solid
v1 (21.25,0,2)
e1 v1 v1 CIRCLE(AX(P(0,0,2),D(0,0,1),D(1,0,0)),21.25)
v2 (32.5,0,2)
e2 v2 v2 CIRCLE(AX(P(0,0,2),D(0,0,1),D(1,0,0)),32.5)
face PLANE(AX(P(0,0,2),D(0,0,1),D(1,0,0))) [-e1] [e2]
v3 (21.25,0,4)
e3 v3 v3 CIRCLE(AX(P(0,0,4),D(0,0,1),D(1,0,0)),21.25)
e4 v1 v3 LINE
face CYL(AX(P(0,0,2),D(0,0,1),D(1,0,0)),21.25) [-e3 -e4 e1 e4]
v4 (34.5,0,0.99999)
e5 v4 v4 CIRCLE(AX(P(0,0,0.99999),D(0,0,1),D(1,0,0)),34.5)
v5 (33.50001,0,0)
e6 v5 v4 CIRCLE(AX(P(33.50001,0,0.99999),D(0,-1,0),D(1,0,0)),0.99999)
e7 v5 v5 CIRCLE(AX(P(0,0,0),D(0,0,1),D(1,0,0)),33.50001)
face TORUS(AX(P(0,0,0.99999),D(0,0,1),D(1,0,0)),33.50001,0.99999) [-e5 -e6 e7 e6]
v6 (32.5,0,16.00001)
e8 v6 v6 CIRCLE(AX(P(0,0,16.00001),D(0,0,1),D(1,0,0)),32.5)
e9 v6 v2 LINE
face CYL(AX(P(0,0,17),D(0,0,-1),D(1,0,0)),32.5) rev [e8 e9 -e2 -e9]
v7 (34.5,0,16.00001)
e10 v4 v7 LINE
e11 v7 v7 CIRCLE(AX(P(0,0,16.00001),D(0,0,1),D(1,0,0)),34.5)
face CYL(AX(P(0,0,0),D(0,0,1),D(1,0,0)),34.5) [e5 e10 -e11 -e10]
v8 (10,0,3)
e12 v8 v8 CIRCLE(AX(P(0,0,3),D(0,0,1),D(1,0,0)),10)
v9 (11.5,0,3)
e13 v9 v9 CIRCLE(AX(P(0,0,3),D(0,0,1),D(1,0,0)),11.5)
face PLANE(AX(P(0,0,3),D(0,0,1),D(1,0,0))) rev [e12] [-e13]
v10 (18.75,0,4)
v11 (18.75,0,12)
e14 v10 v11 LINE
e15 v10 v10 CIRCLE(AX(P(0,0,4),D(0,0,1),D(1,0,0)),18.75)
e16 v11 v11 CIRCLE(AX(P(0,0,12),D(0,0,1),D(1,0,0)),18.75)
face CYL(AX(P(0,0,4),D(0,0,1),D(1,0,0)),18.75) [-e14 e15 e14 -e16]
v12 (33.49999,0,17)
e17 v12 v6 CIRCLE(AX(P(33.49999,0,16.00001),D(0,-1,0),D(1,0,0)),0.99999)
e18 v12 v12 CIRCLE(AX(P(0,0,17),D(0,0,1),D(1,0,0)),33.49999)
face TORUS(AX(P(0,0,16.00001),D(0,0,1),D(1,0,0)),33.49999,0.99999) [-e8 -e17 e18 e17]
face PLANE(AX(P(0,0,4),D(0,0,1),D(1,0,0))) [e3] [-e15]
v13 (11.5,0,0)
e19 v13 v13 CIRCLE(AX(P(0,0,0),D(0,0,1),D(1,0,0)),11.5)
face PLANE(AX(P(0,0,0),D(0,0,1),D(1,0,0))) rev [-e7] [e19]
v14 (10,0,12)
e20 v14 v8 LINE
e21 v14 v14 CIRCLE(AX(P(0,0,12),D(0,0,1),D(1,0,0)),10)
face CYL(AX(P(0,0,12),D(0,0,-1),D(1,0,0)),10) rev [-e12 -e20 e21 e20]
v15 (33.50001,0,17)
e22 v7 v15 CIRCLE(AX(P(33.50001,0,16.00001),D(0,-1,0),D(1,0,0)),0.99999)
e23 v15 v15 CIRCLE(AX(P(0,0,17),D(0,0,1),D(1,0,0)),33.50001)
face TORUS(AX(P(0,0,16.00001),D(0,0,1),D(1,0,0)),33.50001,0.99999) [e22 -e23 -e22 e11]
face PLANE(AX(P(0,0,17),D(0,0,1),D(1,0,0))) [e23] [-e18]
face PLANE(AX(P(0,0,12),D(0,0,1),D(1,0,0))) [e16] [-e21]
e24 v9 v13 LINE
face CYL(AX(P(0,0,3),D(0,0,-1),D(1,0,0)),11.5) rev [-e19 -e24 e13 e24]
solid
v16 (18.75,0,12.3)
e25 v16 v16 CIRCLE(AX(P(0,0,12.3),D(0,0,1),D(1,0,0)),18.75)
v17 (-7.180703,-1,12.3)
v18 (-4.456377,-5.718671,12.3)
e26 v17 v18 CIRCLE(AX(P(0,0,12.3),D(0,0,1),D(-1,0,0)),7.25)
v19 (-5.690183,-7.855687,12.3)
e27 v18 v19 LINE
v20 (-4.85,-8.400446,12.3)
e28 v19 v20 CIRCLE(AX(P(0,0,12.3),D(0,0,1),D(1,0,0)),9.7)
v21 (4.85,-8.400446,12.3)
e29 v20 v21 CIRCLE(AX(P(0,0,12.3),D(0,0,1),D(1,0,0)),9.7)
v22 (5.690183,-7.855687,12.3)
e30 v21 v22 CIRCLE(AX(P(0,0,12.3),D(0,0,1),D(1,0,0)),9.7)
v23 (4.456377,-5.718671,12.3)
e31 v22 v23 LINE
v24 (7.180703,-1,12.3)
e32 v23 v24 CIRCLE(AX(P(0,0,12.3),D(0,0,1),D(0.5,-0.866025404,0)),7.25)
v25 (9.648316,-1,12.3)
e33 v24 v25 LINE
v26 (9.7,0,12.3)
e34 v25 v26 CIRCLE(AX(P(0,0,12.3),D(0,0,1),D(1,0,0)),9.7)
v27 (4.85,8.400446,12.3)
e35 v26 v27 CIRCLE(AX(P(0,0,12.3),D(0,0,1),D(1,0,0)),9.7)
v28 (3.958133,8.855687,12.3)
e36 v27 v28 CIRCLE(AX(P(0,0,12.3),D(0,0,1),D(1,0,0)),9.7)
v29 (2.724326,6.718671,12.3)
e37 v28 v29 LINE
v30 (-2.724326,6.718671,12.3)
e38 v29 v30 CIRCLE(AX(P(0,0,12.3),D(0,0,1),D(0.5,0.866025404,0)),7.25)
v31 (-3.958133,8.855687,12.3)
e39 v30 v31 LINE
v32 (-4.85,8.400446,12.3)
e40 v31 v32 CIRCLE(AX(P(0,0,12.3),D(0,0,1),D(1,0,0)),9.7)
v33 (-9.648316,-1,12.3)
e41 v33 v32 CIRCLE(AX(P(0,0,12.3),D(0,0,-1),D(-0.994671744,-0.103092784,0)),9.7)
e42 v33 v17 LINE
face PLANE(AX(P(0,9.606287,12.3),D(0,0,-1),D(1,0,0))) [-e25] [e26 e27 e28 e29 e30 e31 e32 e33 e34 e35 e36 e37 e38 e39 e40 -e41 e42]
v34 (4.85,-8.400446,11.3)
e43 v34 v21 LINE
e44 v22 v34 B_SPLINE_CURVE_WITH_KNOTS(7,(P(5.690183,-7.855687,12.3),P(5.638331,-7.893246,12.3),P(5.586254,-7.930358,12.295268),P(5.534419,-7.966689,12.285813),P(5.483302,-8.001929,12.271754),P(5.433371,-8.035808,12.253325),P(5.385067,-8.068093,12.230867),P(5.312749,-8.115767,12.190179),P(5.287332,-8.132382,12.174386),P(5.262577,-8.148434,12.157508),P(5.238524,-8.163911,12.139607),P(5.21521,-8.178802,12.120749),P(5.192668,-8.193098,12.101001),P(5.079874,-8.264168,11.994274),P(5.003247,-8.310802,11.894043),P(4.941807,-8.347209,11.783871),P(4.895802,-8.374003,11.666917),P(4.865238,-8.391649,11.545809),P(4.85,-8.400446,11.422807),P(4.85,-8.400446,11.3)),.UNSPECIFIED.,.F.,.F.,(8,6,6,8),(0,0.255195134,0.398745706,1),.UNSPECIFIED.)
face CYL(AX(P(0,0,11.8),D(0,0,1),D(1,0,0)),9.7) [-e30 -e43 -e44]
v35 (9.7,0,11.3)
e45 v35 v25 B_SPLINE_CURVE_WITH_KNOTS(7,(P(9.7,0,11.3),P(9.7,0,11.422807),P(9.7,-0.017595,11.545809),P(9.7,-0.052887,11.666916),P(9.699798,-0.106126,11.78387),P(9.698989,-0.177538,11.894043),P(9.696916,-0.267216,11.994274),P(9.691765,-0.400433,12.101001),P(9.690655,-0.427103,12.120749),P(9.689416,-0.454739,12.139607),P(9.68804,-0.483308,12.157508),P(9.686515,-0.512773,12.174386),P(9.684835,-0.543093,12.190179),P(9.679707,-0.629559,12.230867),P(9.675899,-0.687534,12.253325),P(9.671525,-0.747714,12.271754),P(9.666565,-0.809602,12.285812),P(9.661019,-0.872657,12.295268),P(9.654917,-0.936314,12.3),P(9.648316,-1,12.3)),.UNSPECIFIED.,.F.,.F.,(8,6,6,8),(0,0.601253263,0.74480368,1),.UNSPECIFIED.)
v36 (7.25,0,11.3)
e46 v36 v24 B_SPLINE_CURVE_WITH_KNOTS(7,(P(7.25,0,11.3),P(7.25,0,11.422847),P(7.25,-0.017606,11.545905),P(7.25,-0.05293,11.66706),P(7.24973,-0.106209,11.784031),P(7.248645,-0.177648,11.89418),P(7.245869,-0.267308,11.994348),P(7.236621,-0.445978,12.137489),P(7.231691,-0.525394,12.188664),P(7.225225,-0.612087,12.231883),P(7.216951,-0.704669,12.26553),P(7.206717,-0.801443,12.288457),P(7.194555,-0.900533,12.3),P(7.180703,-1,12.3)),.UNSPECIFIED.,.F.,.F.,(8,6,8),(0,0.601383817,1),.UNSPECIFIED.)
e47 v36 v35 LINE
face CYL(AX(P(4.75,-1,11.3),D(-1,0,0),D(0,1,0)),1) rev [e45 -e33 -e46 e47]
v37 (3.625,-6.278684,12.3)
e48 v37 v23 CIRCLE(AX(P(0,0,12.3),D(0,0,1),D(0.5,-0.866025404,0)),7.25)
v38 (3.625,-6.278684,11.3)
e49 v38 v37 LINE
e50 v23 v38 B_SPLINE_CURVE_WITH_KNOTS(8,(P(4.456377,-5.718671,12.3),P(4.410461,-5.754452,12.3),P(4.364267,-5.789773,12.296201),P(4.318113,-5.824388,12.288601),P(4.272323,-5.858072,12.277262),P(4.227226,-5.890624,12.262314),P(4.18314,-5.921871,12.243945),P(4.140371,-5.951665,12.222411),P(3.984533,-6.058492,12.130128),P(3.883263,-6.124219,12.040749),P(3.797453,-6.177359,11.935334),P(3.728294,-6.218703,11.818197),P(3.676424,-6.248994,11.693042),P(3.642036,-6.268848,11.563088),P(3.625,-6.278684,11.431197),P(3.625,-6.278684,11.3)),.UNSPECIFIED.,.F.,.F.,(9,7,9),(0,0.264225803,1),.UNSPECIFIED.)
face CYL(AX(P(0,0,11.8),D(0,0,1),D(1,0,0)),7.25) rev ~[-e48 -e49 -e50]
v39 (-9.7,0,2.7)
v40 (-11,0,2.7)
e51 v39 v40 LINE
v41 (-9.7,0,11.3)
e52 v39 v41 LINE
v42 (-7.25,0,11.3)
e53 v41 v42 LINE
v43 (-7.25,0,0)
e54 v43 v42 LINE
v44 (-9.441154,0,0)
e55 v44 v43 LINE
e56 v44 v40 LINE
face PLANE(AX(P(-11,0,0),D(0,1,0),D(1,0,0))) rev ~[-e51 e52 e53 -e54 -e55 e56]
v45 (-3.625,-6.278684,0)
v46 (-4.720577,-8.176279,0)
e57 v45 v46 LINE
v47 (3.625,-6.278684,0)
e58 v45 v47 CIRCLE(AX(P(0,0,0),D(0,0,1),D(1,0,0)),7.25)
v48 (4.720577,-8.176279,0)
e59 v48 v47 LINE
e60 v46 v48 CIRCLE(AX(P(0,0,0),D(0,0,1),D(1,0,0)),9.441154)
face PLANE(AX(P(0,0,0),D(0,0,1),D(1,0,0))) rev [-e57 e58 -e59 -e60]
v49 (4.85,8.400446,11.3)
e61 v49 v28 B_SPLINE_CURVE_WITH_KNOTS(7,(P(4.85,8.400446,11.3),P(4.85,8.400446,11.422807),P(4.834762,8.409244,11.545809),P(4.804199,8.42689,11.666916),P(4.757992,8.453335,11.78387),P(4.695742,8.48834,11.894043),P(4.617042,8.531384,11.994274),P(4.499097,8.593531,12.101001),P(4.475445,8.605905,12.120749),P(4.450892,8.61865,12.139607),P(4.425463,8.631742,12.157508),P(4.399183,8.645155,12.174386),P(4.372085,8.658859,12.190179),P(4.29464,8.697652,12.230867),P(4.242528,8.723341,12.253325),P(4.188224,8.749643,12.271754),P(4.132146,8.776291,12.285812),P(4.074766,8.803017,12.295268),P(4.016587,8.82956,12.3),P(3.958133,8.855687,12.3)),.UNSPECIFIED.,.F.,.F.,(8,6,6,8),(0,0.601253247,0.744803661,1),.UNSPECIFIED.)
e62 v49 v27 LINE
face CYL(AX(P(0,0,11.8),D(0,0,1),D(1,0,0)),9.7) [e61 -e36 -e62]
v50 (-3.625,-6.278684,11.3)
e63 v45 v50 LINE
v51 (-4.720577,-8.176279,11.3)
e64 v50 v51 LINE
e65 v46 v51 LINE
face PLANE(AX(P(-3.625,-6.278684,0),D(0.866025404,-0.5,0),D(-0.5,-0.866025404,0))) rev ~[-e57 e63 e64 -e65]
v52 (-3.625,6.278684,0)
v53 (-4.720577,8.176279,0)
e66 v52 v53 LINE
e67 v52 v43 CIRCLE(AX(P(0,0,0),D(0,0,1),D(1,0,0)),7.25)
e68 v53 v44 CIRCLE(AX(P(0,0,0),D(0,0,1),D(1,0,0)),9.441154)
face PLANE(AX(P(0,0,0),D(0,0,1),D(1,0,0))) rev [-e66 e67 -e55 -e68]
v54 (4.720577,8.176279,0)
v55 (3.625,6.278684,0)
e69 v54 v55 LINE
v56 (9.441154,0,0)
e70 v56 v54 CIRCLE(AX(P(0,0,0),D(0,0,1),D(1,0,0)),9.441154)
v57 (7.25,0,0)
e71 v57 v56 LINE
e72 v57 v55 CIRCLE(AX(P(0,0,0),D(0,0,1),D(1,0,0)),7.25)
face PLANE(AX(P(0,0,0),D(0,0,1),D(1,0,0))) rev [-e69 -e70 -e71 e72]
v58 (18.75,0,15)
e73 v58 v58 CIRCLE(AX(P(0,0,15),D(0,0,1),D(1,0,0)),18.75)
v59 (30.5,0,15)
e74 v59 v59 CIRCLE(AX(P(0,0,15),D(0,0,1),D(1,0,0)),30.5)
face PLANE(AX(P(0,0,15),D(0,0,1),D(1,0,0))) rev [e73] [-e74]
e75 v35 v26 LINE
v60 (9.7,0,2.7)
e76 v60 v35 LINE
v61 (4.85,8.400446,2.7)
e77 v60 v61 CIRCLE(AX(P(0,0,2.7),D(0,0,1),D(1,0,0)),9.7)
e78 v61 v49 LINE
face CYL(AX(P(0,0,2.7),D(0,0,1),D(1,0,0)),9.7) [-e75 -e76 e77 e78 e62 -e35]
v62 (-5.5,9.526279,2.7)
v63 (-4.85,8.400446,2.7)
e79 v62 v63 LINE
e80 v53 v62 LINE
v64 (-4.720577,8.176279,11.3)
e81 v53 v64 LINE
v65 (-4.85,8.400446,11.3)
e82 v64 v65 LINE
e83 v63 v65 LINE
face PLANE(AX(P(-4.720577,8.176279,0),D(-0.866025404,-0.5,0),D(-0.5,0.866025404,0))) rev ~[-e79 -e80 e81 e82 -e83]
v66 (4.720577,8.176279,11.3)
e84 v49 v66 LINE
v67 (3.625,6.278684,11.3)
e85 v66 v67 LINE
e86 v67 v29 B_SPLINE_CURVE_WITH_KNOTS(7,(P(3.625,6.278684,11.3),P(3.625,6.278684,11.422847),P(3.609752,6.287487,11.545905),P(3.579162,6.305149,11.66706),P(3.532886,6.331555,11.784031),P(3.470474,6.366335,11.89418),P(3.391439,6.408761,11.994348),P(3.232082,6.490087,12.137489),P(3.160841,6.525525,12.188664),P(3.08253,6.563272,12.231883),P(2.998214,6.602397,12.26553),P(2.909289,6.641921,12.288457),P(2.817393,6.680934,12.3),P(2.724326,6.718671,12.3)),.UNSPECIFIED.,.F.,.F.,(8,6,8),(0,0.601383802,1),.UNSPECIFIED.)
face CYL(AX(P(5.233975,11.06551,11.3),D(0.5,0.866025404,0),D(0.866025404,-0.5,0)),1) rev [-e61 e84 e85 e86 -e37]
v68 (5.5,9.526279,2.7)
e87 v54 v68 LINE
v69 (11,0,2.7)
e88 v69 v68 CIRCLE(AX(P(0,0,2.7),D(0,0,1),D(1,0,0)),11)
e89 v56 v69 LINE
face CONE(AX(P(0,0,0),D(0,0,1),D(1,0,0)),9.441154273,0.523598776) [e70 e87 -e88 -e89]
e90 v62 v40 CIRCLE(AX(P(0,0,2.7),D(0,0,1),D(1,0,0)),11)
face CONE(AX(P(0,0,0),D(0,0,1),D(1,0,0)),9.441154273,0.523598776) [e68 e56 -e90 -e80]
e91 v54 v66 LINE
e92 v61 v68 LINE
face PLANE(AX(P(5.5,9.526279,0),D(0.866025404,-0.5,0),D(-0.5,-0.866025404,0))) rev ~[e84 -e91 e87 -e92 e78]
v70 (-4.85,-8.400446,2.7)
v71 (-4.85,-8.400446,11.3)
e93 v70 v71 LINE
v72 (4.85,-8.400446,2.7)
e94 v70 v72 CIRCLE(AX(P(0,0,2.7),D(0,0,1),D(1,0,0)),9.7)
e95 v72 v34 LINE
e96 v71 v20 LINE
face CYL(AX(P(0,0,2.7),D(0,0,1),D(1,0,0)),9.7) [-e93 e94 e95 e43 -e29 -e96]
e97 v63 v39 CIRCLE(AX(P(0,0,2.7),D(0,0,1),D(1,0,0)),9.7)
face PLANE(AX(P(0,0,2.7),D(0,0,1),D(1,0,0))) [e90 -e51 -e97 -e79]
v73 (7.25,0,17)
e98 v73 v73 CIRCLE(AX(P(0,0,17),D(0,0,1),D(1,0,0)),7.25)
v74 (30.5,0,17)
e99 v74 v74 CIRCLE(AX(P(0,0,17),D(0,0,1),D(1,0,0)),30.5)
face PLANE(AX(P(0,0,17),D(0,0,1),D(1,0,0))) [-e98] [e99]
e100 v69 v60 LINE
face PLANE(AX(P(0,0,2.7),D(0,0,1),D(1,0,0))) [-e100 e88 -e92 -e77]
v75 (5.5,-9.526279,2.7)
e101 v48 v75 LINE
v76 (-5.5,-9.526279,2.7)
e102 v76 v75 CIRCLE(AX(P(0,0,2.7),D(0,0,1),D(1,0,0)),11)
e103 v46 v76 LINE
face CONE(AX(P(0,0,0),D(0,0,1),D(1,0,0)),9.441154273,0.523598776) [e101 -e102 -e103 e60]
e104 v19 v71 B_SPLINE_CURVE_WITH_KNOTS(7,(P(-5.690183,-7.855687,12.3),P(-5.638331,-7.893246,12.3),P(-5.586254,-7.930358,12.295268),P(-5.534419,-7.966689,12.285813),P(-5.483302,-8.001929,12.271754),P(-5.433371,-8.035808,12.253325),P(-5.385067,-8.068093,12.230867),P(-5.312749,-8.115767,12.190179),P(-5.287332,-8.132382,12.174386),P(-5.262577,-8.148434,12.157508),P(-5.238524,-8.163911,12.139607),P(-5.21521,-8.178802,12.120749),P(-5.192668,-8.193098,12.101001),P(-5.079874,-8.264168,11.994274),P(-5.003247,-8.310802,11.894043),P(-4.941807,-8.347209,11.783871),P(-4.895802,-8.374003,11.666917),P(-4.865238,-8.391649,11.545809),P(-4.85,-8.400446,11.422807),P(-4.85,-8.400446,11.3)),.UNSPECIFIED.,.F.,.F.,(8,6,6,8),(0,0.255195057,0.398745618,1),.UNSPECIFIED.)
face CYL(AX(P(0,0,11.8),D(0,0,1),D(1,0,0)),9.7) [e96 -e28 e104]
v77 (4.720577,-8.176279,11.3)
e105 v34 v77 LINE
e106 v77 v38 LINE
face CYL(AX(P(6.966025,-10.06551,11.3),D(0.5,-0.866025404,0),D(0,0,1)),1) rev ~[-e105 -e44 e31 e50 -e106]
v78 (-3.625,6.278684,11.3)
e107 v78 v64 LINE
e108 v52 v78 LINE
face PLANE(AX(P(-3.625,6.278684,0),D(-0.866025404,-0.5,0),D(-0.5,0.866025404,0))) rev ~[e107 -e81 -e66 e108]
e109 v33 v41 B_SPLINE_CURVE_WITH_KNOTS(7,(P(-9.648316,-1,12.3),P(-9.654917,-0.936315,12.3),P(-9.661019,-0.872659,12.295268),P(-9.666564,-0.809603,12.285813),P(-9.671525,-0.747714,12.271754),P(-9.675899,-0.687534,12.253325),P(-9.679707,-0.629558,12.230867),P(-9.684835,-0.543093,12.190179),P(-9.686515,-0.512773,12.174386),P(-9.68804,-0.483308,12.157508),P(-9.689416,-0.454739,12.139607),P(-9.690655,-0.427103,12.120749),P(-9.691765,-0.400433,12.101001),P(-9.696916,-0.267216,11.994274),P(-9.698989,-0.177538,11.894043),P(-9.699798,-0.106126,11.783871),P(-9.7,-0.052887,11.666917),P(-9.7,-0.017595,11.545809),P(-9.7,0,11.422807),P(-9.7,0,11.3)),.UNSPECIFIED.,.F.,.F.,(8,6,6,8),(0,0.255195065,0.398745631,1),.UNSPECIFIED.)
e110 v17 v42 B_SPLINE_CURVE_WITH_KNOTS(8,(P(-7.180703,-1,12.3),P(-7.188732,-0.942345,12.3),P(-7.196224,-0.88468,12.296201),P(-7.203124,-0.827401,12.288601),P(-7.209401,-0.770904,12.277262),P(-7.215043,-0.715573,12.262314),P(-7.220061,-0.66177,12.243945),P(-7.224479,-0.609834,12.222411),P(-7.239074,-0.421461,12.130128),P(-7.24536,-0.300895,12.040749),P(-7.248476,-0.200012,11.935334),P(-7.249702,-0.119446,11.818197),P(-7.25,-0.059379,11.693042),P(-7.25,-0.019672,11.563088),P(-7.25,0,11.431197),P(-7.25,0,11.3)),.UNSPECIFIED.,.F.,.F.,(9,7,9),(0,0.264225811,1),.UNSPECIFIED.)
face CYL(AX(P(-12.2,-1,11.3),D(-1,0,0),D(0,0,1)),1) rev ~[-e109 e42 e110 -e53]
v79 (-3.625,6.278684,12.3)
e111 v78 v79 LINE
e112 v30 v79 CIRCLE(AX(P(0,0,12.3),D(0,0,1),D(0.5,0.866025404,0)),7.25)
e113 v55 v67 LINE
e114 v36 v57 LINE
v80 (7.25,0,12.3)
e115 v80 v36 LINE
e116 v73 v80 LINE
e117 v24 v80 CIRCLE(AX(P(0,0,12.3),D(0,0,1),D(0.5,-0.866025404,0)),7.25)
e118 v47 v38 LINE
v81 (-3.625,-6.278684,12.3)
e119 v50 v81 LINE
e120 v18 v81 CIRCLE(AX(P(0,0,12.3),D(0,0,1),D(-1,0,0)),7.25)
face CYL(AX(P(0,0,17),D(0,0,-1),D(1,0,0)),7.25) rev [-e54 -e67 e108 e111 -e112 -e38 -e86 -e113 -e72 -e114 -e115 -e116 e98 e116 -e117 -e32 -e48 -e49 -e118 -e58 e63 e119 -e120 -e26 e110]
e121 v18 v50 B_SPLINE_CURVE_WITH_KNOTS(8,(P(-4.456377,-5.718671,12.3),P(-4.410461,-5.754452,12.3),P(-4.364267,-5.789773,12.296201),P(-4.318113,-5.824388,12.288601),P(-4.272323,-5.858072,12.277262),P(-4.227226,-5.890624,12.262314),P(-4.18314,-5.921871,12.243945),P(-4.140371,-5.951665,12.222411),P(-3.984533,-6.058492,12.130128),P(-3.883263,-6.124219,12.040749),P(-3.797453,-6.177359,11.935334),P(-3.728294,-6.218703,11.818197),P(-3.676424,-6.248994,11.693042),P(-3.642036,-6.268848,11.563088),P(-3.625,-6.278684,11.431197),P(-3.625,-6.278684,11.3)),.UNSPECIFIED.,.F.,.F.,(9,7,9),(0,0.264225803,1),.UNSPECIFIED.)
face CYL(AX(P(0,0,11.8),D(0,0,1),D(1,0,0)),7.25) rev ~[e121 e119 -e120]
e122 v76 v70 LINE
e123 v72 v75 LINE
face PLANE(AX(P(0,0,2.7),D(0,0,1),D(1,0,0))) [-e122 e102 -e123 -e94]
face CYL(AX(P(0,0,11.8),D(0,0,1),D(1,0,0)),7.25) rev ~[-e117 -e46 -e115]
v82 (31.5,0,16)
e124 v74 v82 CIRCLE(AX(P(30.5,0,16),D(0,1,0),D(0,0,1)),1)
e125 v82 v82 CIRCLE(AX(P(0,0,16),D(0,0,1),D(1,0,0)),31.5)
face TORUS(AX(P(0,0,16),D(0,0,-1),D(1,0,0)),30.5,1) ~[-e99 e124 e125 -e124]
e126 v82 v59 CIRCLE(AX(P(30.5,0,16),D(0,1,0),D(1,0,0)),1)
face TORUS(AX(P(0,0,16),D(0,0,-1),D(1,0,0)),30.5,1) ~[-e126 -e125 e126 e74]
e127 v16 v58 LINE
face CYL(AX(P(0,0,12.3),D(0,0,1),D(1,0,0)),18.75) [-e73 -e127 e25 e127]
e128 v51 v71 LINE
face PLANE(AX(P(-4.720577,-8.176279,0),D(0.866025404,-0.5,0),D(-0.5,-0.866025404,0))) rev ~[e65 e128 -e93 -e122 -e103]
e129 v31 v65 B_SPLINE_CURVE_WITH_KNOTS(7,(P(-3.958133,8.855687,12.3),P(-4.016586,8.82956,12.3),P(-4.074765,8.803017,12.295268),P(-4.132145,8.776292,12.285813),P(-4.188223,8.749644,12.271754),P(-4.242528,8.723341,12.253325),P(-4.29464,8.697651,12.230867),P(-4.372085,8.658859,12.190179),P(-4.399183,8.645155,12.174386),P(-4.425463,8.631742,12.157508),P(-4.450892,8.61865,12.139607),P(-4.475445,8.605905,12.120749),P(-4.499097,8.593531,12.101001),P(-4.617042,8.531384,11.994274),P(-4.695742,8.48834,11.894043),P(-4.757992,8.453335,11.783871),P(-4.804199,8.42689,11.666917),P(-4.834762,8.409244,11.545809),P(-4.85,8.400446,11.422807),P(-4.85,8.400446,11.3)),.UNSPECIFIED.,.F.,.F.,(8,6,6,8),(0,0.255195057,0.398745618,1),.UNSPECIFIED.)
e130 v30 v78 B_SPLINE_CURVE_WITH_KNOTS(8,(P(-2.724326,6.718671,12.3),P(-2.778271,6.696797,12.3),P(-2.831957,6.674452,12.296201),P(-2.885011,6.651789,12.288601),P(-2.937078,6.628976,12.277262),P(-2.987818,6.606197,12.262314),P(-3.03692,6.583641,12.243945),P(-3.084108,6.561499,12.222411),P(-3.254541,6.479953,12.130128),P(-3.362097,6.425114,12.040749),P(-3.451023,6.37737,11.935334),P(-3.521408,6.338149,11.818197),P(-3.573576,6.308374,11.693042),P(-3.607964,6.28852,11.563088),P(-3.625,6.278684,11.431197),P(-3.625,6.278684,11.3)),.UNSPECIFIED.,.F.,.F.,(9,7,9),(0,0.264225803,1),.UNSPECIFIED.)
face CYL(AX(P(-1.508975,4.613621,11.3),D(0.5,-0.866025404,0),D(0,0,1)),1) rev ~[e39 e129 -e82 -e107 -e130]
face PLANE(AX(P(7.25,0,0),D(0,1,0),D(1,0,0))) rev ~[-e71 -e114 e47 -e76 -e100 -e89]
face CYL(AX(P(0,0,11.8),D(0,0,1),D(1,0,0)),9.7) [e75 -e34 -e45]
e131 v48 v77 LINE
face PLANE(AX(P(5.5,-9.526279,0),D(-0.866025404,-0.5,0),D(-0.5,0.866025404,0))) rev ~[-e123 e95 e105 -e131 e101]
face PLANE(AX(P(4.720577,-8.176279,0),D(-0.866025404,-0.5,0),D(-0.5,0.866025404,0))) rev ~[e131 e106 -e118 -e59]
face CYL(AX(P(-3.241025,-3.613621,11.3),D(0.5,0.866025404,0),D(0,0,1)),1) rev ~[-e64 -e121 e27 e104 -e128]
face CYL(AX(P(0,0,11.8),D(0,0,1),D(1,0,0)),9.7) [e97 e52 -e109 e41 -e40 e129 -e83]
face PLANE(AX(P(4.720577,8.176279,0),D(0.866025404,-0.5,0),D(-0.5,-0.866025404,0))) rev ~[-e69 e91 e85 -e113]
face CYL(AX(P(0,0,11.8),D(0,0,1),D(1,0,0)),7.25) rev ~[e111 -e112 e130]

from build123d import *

# Parameters (mm, degrees)
F3_DEPTH     = 12.3
F4_T4_DEPTH  = 7.45
F4_S5_R      = 7.25
F4_T6_DEPTH  = 6
F4_S7_R      = 9.7
F4_T8_DEPTH  = 6
F4_T12_DEPTH = 7.45
F4_S13_R     = 7.25
F4_T14_DEPTH = 6
F4_S15_R     = 9.7
F4_T16_DEPTH = 6
F4_T20_DEPTH = 7.45
F4_S21_R     = 7.25
F4_T22_DEPTH = 5
F4_S23_R     = 9.7
F4_T24_DEPTH = 5
F4_T28_DEPTH = 7.45
F4_S29_R     = 7.25
F4_T30_DEPTH = 6
F4_S31_R     = 9.7
F4_T32_DEPTH = 6
F4_T36_DEPTH = 7.45
F4_S37_R     = 7.25
F4_T38_DEPTH = 6
F4_S39_R     = 9.7
F4_T40_DEPTH = 6
F4_T44_DEPTH = 7.45
F4_S45_R     = 7.25
F4_T46_DEPTH = 5
F4_S47_R     = 9.7
F4_T48_DEPTH = 5
F5_R         = 0.99999


# Not quite as in the source:
# - a fillet or chamfer that OpenCascade refuses, or shapes differently, is made with other operations: its cross-section is extruded or revolved along the edge and cut away or added
# - a fillet or chamfer is up to 0.001 mm smaller than in the source, because OpenCascade refuses the exact size


with BuildPart() as f1:
    # F0 (on Front) → F1 (revolve)
    with BuildSketch(Plane.XZ):
        Polygon((18.75, 12), (10, 12), (10, 3), (11.5, 3), (11.5, 0), (34.5, 0), (34.5, 17), (32.5, 17), (32.5, 2), (21.25, 2), (21.25, 4), (18.75, 4), align=None)
    revolve(axis=Axis((0, 0, 6), (0, 0, 1)))

    # F5 (radius 1 in the source; OpenCascade refuses exactly that, so slightly less here)
    f5_edges = [f1.edges().sort_by_distance(p)[0] for p in [
        (-32.5, 0, 17),
        (-34.5, 0, 17),
        (-34.5, 0, 0),
    ]]
    fillet(f5_edges, radius=F5_R)


with BuildPart() as f1b:
    # F0 (on Front) → F1, piece 2 (revolve)
    with BuildSketch(Plane.XZ):
        Polygon((31.5, 17), (7.25, 17), (7.25, 0), (9.4411542732, 0), (11, 2.7), (9.7, 2.7), (9.7, 12.3), (18.75, 12.3), (18.75, 15), (31.5, 15), align=None)
    revolve(axis=Axis((0, 0, 6), (0, 0, 1)))

    # F2 (on face) → F3 (cut, through all)
    with BuildSketch(Plane(origin=(0, 0, 0), x_dir=(1, 0, 0), z_dir=(0, 0, -1))):
        with BuildLine():
            Line((-4.7205771366, -8.1762794416), (-5.5, -9.5262794416))
            ThreePointArc((-5.5, -9.5262794416), (0, -11), (5.5, -9.5262794416))
            Line((5.5, -9.5262794416), (4.7205771366, -8.1762794416))
            ThreePointArc((4.7205771366, -8.1762794416), (0, -9.4411542732), (-4.7205771366, -8.1762794416))
        make_face()
        with BuildLine():
            Line((-3.625, -6.2786841774), (-4.7205771366, -8.1762794416))
            ThreePointArc((-4.7205771366, -8.1762794416), (0, -9.4411542732), (4.7205771366, -8.1762794416))
            Line((4.7205771366, -8.1762794416), (3.625, -6.2786841774))
            ThreePointArc((3.625, -6.2786841774), (0, -7.25), (-3.625, -6.2786841774))
        make_face()
        with BuildLine():
            Line((-11, 0), (-9.4411542732, 0))
            ThreePointArc((-9.4411542732, 0), (-8.1762794416, 4.7205771366), (-4.7205771366, 8.1762794416))
            Line((-4.7205771366, 8.1762794416), (-5.5, 9.5262794416))
            ThreePointArc((-5.5, 9.5262794416), (-9.5262794416, 5.5), (-11, 0))
        make_face()
        with BuildLine():
            Line((7.25, 0), (9.4411542732, 0))
            ThreePointArc((9.4411542732, 0), (8.1762794416, 4.7205771366), (4.7205771366, 8.1762794416))
            Line((4.7205771366, 8.1762794416), (3.625, 6.2786841774))
            ThreePointArc((3.625, 6.2786841774), (6.2786841774, 3.625), (7.25, 0))
        make_face()
        with BuildLine():
            ThreePointArc((4.7205771366, 8.1762794416), (8.1762794416, 4.7205771366), (9.4411542732, 0))
            Line((9.4411542732, 0), (11, 0))
            ThreePointArc((11, 0), (9.5262794416, 5.5), (5.5, 9.5262794416))
            Line((5.5, 9.5262794416), (4.7205771366, 8.1762794416))
        make_face()
        with BuildLine():
            ThreePointArc((-4.7205771366, 8.1762794416), (-8.1762794416, 4.7205771366), (-9.4411542732, 0))
            Line((-9.4411542732, 0), (-7.25, 0))
            ThreePointArc((-7.25, 0), (-6.2786841774, 3.625), (-3.625, 6.2786841774))
            Line((-3.625, 6.2786841774), (-4.7205771366, 8.1762794416))
        make_face()
    extrude(amount=-F3_DEPTH, mode=Mode.SUBTRACT)

    # F4: fillet of radius 1 on 8 edges, made by hand


with BuildPart() as f4_tool2:
    # F4_s3 → F4_t4 (new body)
    with BuildSketch(Plane(origin=(-2.375, 4.113620668, 0), x_dir=(0, 0, 1), z_dir=(-0.5, 0.8660254038, 0))):
        with BuildLine():
            ThreePointArc((12.3, 1), (12.0071067812, 0.2928932188), (11.3, 0))
            Line((11.3, 0), (12.3, 0))
            Line((12.3, 0), (12.3, 1))
        make_face()
    extrude(amount=F4_T4_DEPTH)

    # F4_s5 → F4_t6 (cut, symmetric)
    with BuildSketch(Plane.XY.offset(11.8)):
        Circle(F4_S5_R)
    extrude(amount=F4_T6_DEPTH, both=True, mode=Mode.SUBTRACT)

    # F4_s7 → F4_t8 (intersect, symmetric)
    with BuildSketch(Plane.XY.offset(11.8)):
        Circle(F4_S7_R)
    extrude(amount=F4_T8_DEPTH, both=True, mode=Mode.INTERSECT)


with BuildPart() as f1b_1:
    add(f1b.part)

    # F4_t1: union F4_tool2
    add(f4_tool2.part)


with BuildPart() as f4_tool10:
    # F4_s11 → F4_t12 (new body)
    with BuildSketch(Plane(origin=(6.1, 10.5655099262, 0), x_dir=(0, 0, 1), z_dir=(-0.5, -0.8660254038, 0))):
        with BuildLine():
            ThreePointArc((11.3, 0), (12.0071067812, 0.2928932188), (12.3, 1))
            Line((12.3, 1), (12.3, 0))
            Line((12.3, 0), (11.3, 0))
        make_face()
    extrude(amount=F4_T12_DEPTH)

    # F4_s13 → F4_t14 (cut, symmetric)
    with BuildSketch(Plane.XY.offset(11.8)):
        Circle(F4_S13_R)
    extrude(amount=F4_T14_DEPTH, both=True, mode=Mode.SUBTRACT)

    # F4_s15 → F4_t16 (intersect, symmetric)
    with BuildSketch(Plane.XY.offset(11.8)):
        Circle(F4_S15_R)
    extrude(amount=F4_T16_DEPTH, both=True, mode=Mode.INTERSECT)


with BuildPart() as f1b_2:
    add(f1b_1.part)

    # F4_t9: union F4_tool10
    add(f4_tool10.part)


with BuildPart() as f4_tool18:
    # F4_s19 → F4_t20 (new body)
    with BuildSketch(Plane.YZ.offset(-12.2)):
        with BuildLine():
            ThreePointArc((-1, 12.3), (-0.2928932188, 12.0071067812), (0, 11.3))
            Line((0, 11.3), (0, 12.3))
            Line((0, 12.3), (-1, 12.3))
        make_face()
    extrude(amount=F4_T20_DEPTH)

    # F4_s21 → F4_t22 (cut, symmetric)
    with BuildSketch(Plane.XY.offset(11.8)):
        Circle(F4_S21_R)
    extrude(amount=F4_T22_DEPTH, both=True, mode=Mode.SUBTRACT)

    # F4_s23 → F4_t24 (intersect, symmetric)
    with BuildSketch(Plane.XY.offset(11.8)):
        Circle(F4_S23_R)
    extrude(amount=F4_T24_DEPTH, both=True, mode=Mode.INTERSECT)


with BuildPart() as f1b_3:
    add(f1b_2.part)

    # F4_t17: union F4_tool18
    add(f4_tool18.part)


with BuildPart() as f4_tool26:
    # F4_s27 → F4_t28 (new body)
    with BuildSketch(Plane(origin=(-2.375, -4.113620668, 0), x_dir=(0, 0, 1), z_dir=(-0.5, -0.8660254038, 0))):
        with BuildLine():
            ThreePointArc((12.3, 1), (12.0071067812, 0.2928932188), (11.3, 0))
            Line((11.3, 0), (12.3, 0))
            Line((12.3, 0), (12.3, 1))
        make_face()
    extrude(amount=F4_T28_DEPTH)

    # F4_s29 → F4_t30 (cut, symmetric)
    with BuildSketch(Plane.XY.offset(11.8)):
        Circle(F4_S29_R)
    extrude(amount=F4_T30_DEPTH, both=True, mode=Mode.SUBTRACT)

    # F4_s31 → F4_t32 (intersect, symmetric)
    with BuildSketch(Plane.XY.offset(11.8)):
        Circle(F4_S31_R)
    extrude(amount=F4_T32_DEPTH, both=True, mode=Mode.INTERSECT)


with BuildPart() as f1b_4:
    add(f1b_3.part)

    # F4_t25: union F4_tool26
    add(f4_tool26.part)


with BuildPart() as f4_tool34:
    # F4_s35 → F4_t36 (new body)
    with BuildSketch(Plane(origin=(6.1, -10.5655099262, 0), x_dir=(0, 0, 1), z_dir=(-0.5, 0.8660254038, 0))):
        with BuildLine():
            ThreePointArc((12.3, 1), (12.0071067812, 0.2928932188), (11.3, 0))
            Line((11.3, 0), (12.3, 0))
            Line((12.3, 0), (12.3, 1))
        make_face()
    extrude(amount=F4_T36_DEPTH)

    # F4_s37 → F4_t38 (cut, symmetric)
    with BuildSketch(Plane.XY.offset(11.8)):
        Circle(F4_S37_R)
    extrude(amount=F4_T38_DEPTH, both=True, mode=Mode.SUBTRACT)

    # F4_s39 → F4_t40 (intersect, symmetric)
    with BuildSketch(Plane.XY.offset(11.8)):
        Circle(F4_S39_R)
    extrude(amount=F4_T40_DEPTH, both=True, mode=Mode.INTERSECT)


with BuildPart() as f1b_5:
    add(f1b_4.part)

    # F4_t33: union F4_tool34
    add(f4_tool34.part)


with BuildPart() as f4_tool42:
    # F4_s43 → F4_t44 (new body)
    with BuildSketch(Plane.YZ.offset(4.75)):
        with BuildLine():
            ThreePointArc((0, 11.3), (-0.2928932188, 12.0071067812), (-1, 12.3))
            Line((-1, 12.3), (0, 12.3))
            Line((0, 12.3), (0, 11.3))
        make_face()
    extrude(amount=F4_T44_DEPTH)

    # F4_s45 → F4_t46 (cut, symmetric)
    with BuildSketch(Plane.XY.offset(11.8)):
        Circle(F4_S45_R)
    extrude(amount=F4_T46_DEPTH, both=True, mode=Mode.SUBTRACT)

    # F4_s47 → F4_t48 (intersect, symmetric)
    with BuildSketch(Plane.XY.offset(11.8)):
        Circle(F4_S47_R)
    extrude(amount=F4_T48_DEPTH, both=True, mode=Mode.INTERSECT)


with BuildPart() as f1b_6:
    add(f1b_5.part)

    # F4_t41: union F4_tool42
    add(f4_tool42.part)

    # F4_s49 → F4_t50 (revolve, cut)
    with BuildSketch(Plane.XZ):
        with BuildLine():
            ThreePointArc((31.5, 16), (31.2071067812, 15.2928932188), (30.5, 15))
            Line((30.5, 15), (31.5, 15))
            Line((31.5, 15), (31.5, 16))
        make_face()
    revolve(axis=Axis((0, 0, 15), (0, 0, 1)), mode=Mode.SUBTRACT)

    # F4_s51 → F4_t52 (revolve, cut)
    with BuildSketch(Plane.XZ):
        with BuildLine():
            ThreePointArc((30.5, 17), (31.2071067812, 16.7071067812), (31.5, 16))
            Line((31.5, 16), (31.5, 17))
            Line((31.5, 17), (30.5, 17))
        make_face()
    revolve(axis=Axis((0, 0, 17), (0, 0, 1)), mode=Mode.SUBTRACT)


solid = Compound([f1.part, f1b_6.part])
